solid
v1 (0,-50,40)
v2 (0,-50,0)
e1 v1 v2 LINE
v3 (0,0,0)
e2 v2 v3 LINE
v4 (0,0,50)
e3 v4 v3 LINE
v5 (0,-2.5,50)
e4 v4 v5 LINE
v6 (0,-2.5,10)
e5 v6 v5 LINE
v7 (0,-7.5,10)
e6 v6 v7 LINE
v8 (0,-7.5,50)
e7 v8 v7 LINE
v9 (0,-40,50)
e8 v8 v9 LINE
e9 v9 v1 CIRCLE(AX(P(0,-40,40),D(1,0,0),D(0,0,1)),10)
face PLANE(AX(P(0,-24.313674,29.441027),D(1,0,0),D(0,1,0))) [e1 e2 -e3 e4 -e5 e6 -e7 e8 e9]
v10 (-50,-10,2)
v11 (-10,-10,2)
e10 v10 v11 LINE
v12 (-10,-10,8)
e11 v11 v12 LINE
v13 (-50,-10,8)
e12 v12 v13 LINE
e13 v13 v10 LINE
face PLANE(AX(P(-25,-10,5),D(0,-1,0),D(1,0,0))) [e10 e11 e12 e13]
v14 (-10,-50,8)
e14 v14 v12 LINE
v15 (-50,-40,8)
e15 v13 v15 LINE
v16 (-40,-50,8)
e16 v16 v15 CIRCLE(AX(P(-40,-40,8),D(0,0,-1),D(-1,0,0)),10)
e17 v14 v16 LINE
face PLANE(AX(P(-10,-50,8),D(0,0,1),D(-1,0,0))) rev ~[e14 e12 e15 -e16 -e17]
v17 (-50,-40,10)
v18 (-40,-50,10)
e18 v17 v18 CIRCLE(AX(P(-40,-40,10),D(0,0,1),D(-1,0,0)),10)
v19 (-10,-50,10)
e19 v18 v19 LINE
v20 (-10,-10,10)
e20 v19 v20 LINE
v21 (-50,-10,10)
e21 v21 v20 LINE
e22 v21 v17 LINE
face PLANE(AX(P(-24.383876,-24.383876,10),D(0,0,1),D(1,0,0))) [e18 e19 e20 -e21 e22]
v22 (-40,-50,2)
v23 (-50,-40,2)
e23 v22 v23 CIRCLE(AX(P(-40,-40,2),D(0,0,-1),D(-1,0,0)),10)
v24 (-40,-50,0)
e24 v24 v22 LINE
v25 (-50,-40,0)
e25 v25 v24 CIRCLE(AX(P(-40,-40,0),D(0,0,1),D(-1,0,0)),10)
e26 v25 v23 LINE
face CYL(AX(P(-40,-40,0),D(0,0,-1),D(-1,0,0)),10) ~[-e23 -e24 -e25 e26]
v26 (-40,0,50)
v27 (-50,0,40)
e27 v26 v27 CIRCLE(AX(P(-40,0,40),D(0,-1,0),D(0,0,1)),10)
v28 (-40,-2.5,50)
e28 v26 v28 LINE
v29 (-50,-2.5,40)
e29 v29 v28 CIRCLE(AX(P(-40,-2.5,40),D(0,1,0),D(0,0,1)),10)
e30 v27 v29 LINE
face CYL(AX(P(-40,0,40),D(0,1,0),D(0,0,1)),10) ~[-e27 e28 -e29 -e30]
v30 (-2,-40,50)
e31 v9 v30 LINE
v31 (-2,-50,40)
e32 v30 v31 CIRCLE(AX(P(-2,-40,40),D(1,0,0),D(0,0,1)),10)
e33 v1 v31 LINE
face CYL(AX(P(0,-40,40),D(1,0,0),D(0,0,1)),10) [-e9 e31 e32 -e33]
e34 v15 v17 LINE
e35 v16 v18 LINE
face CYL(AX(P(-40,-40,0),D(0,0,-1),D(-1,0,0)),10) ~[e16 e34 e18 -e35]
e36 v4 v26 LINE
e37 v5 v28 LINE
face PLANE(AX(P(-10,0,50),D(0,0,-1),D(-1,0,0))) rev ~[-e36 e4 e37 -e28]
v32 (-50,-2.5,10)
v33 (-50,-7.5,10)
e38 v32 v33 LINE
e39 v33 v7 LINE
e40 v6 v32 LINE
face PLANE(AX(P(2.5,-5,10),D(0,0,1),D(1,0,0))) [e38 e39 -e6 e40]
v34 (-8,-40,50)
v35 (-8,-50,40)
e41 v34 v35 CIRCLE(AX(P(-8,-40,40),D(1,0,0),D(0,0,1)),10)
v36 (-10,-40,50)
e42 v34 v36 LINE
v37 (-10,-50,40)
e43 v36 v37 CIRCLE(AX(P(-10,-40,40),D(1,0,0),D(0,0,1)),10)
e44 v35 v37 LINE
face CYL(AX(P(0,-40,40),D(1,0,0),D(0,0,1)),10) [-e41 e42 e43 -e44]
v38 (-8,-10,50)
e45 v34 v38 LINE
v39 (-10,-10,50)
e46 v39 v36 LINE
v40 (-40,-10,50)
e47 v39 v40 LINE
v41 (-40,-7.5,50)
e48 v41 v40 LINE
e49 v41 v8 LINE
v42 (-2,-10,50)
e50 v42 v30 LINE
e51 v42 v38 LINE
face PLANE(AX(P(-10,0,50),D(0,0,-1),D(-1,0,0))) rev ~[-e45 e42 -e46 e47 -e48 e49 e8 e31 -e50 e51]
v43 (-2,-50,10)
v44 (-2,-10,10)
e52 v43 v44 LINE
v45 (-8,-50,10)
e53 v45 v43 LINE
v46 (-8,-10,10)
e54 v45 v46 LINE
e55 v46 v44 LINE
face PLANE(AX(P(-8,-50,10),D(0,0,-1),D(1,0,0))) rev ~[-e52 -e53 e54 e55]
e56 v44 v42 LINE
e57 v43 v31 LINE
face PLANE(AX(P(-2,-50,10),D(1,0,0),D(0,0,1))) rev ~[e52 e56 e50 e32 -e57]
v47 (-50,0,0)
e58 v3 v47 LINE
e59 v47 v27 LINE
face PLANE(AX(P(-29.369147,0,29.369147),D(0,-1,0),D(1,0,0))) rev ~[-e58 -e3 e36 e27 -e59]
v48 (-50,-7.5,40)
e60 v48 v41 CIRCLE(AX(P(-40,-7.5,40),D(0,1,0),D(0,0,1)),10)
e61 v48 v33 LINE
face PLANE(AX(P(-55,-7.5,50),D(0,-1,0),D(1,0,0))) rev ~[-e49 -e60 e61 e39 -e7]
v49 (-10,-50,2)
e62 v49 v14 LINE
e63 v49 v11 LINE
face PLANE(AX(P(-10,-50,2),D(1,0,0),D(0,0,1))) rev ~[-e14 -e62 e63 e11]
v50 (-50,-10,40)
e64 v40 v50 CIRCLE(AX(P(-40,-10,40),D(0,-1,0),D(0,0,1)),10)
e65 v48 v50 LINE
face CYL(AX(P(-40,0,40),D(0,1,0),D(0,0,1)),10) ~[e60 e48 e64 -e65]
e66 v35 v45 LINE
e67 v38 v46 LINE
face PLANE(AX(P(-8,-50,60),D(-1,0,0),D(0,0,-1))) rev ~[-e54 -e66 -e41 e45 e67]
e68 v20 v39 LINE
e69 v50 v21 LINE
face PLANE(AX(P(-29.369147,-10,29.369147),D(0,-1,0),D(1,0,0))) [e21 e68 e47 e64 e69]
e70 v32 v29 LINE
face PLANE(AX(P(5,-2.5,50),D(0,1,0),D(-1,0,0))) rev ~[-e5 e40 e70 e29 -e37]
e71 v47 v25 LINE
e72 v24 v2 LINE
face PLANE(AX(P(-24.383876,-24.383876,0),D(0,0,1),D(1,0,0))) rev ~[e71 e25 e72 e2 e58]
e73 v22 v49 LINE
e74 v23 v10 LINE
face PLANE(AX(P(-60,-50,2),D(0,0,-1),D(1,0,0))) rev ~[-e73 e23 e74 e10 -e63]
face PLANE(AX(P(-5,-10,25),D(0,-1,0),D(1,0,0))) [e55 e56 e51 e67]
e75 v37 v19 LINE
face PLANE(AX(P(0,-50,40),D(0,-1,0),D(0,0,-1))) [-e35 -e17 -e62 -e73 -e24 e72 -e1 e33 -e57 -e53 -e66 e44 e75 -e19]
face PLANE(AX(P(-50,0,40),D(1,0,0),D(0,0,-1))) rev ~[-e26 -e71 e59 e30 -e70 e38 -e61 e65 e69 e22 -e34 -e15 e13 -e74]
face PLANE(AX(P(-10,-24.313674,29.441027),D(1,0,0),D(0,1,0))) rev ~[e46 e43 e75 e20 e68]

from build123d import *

# Parameters (mm, degrees)
F1_DEPTH = 10
F3_DEPTH = 10
F5_DEPTH = 10
F6_W     = 20
F6_H     = 6
F6_W_2   = 6
F6_H_2   = 30
F6_H_3   = 20
F7_DEPTH = 40
F8_W     = 5
F8_H     = 5
F8_W_2   = 15
F8_W_3   = 40
F9_DEPTH = 40


# Not quite as in the source:
# - a feature names something its author has since deleted; it is built from what else it names


with BuildPart() as f1:
    # F0 (on Top) → F1 (new body)
    with BuildSketch(Plane.XY):
        with BuildLine():
            Line((0, -50), (0, 0))
            Line((0, 0), (-50, 0))
            Line((-50, 0), (-50, -40))
            ThreePointArc((-50, -40), (-47.0710678119, -47.0710678119), (-40, -50))
            Line((-40, -50), (0, -50))
        make_face()
    extrude(amount=F1_DEPTH)

    # F2 (on Right) → F3 (join)
    with BuildSketch(Plane.YZ):
        with BuildLine():
            Line((-50, 10), (0, 10))
            Line((0, 10), (0, 50))
            Line((0, 50), (-40, 50))
            ThreePointArc((-40, 50), (-47.0710678119, 47.0710678119), (-50, 40))
            Line((-50, 40), (-50, 10))
        make_face()
    extrude(amount=-F3_DEPTH)

    # F4 (on Front) → F5 (join)
    with BuildSketch(Plane.XZ):
        with BuildLine():
            Line((-50, 10), (-10, 10))
            Line((-10, 10), (-10, 50))
            Line((-10, 50), (-40, 50))
            ThreePointArc((-40, 50), (-47.0710678119, 47.0710678119), (-50, 40))
            Line((-50, 40), (-50, 10))
        make_face()
    extrude(amount=F5_DEPTH)

    # F6 (on face) → F7 (cut)
    with BuildSketch(Plane.XZ.offset(50)):
        Polygon((-15, 2), (-10, 2), (-10, 8), (-40, 8), (-40, 2), align=None)
        with Locations((-50, 5)):
            Rectangle(F6_W, F6_H)
        with Locations((-5, 25)):
            Rectangle(F6_W_2, F6_H_2)
        with Locations((-5, 50)):
            Rectangle(F6_W_2, F6_H_3)
    extrude(amount=-F7_DEPTH, mode=Mode.SUBTRACT)

    # F8 (on face) → F9 (cut)
    with BuildSketch(Plane.XY.offset(50)):
        with Locations((2.5, -5)):
            Rectangle(F8_W, F8_H)
        with Locations((-47.5, -5)):
            Rectangle(F8_W_2, F8_H)
        with Locations((-20, -5)):
            Rectangle(F8_W_3, F8_H)
    extrude(amount=-F9_DEPTH, mode=Mode.SUBTRACT)


solid = f1.part
